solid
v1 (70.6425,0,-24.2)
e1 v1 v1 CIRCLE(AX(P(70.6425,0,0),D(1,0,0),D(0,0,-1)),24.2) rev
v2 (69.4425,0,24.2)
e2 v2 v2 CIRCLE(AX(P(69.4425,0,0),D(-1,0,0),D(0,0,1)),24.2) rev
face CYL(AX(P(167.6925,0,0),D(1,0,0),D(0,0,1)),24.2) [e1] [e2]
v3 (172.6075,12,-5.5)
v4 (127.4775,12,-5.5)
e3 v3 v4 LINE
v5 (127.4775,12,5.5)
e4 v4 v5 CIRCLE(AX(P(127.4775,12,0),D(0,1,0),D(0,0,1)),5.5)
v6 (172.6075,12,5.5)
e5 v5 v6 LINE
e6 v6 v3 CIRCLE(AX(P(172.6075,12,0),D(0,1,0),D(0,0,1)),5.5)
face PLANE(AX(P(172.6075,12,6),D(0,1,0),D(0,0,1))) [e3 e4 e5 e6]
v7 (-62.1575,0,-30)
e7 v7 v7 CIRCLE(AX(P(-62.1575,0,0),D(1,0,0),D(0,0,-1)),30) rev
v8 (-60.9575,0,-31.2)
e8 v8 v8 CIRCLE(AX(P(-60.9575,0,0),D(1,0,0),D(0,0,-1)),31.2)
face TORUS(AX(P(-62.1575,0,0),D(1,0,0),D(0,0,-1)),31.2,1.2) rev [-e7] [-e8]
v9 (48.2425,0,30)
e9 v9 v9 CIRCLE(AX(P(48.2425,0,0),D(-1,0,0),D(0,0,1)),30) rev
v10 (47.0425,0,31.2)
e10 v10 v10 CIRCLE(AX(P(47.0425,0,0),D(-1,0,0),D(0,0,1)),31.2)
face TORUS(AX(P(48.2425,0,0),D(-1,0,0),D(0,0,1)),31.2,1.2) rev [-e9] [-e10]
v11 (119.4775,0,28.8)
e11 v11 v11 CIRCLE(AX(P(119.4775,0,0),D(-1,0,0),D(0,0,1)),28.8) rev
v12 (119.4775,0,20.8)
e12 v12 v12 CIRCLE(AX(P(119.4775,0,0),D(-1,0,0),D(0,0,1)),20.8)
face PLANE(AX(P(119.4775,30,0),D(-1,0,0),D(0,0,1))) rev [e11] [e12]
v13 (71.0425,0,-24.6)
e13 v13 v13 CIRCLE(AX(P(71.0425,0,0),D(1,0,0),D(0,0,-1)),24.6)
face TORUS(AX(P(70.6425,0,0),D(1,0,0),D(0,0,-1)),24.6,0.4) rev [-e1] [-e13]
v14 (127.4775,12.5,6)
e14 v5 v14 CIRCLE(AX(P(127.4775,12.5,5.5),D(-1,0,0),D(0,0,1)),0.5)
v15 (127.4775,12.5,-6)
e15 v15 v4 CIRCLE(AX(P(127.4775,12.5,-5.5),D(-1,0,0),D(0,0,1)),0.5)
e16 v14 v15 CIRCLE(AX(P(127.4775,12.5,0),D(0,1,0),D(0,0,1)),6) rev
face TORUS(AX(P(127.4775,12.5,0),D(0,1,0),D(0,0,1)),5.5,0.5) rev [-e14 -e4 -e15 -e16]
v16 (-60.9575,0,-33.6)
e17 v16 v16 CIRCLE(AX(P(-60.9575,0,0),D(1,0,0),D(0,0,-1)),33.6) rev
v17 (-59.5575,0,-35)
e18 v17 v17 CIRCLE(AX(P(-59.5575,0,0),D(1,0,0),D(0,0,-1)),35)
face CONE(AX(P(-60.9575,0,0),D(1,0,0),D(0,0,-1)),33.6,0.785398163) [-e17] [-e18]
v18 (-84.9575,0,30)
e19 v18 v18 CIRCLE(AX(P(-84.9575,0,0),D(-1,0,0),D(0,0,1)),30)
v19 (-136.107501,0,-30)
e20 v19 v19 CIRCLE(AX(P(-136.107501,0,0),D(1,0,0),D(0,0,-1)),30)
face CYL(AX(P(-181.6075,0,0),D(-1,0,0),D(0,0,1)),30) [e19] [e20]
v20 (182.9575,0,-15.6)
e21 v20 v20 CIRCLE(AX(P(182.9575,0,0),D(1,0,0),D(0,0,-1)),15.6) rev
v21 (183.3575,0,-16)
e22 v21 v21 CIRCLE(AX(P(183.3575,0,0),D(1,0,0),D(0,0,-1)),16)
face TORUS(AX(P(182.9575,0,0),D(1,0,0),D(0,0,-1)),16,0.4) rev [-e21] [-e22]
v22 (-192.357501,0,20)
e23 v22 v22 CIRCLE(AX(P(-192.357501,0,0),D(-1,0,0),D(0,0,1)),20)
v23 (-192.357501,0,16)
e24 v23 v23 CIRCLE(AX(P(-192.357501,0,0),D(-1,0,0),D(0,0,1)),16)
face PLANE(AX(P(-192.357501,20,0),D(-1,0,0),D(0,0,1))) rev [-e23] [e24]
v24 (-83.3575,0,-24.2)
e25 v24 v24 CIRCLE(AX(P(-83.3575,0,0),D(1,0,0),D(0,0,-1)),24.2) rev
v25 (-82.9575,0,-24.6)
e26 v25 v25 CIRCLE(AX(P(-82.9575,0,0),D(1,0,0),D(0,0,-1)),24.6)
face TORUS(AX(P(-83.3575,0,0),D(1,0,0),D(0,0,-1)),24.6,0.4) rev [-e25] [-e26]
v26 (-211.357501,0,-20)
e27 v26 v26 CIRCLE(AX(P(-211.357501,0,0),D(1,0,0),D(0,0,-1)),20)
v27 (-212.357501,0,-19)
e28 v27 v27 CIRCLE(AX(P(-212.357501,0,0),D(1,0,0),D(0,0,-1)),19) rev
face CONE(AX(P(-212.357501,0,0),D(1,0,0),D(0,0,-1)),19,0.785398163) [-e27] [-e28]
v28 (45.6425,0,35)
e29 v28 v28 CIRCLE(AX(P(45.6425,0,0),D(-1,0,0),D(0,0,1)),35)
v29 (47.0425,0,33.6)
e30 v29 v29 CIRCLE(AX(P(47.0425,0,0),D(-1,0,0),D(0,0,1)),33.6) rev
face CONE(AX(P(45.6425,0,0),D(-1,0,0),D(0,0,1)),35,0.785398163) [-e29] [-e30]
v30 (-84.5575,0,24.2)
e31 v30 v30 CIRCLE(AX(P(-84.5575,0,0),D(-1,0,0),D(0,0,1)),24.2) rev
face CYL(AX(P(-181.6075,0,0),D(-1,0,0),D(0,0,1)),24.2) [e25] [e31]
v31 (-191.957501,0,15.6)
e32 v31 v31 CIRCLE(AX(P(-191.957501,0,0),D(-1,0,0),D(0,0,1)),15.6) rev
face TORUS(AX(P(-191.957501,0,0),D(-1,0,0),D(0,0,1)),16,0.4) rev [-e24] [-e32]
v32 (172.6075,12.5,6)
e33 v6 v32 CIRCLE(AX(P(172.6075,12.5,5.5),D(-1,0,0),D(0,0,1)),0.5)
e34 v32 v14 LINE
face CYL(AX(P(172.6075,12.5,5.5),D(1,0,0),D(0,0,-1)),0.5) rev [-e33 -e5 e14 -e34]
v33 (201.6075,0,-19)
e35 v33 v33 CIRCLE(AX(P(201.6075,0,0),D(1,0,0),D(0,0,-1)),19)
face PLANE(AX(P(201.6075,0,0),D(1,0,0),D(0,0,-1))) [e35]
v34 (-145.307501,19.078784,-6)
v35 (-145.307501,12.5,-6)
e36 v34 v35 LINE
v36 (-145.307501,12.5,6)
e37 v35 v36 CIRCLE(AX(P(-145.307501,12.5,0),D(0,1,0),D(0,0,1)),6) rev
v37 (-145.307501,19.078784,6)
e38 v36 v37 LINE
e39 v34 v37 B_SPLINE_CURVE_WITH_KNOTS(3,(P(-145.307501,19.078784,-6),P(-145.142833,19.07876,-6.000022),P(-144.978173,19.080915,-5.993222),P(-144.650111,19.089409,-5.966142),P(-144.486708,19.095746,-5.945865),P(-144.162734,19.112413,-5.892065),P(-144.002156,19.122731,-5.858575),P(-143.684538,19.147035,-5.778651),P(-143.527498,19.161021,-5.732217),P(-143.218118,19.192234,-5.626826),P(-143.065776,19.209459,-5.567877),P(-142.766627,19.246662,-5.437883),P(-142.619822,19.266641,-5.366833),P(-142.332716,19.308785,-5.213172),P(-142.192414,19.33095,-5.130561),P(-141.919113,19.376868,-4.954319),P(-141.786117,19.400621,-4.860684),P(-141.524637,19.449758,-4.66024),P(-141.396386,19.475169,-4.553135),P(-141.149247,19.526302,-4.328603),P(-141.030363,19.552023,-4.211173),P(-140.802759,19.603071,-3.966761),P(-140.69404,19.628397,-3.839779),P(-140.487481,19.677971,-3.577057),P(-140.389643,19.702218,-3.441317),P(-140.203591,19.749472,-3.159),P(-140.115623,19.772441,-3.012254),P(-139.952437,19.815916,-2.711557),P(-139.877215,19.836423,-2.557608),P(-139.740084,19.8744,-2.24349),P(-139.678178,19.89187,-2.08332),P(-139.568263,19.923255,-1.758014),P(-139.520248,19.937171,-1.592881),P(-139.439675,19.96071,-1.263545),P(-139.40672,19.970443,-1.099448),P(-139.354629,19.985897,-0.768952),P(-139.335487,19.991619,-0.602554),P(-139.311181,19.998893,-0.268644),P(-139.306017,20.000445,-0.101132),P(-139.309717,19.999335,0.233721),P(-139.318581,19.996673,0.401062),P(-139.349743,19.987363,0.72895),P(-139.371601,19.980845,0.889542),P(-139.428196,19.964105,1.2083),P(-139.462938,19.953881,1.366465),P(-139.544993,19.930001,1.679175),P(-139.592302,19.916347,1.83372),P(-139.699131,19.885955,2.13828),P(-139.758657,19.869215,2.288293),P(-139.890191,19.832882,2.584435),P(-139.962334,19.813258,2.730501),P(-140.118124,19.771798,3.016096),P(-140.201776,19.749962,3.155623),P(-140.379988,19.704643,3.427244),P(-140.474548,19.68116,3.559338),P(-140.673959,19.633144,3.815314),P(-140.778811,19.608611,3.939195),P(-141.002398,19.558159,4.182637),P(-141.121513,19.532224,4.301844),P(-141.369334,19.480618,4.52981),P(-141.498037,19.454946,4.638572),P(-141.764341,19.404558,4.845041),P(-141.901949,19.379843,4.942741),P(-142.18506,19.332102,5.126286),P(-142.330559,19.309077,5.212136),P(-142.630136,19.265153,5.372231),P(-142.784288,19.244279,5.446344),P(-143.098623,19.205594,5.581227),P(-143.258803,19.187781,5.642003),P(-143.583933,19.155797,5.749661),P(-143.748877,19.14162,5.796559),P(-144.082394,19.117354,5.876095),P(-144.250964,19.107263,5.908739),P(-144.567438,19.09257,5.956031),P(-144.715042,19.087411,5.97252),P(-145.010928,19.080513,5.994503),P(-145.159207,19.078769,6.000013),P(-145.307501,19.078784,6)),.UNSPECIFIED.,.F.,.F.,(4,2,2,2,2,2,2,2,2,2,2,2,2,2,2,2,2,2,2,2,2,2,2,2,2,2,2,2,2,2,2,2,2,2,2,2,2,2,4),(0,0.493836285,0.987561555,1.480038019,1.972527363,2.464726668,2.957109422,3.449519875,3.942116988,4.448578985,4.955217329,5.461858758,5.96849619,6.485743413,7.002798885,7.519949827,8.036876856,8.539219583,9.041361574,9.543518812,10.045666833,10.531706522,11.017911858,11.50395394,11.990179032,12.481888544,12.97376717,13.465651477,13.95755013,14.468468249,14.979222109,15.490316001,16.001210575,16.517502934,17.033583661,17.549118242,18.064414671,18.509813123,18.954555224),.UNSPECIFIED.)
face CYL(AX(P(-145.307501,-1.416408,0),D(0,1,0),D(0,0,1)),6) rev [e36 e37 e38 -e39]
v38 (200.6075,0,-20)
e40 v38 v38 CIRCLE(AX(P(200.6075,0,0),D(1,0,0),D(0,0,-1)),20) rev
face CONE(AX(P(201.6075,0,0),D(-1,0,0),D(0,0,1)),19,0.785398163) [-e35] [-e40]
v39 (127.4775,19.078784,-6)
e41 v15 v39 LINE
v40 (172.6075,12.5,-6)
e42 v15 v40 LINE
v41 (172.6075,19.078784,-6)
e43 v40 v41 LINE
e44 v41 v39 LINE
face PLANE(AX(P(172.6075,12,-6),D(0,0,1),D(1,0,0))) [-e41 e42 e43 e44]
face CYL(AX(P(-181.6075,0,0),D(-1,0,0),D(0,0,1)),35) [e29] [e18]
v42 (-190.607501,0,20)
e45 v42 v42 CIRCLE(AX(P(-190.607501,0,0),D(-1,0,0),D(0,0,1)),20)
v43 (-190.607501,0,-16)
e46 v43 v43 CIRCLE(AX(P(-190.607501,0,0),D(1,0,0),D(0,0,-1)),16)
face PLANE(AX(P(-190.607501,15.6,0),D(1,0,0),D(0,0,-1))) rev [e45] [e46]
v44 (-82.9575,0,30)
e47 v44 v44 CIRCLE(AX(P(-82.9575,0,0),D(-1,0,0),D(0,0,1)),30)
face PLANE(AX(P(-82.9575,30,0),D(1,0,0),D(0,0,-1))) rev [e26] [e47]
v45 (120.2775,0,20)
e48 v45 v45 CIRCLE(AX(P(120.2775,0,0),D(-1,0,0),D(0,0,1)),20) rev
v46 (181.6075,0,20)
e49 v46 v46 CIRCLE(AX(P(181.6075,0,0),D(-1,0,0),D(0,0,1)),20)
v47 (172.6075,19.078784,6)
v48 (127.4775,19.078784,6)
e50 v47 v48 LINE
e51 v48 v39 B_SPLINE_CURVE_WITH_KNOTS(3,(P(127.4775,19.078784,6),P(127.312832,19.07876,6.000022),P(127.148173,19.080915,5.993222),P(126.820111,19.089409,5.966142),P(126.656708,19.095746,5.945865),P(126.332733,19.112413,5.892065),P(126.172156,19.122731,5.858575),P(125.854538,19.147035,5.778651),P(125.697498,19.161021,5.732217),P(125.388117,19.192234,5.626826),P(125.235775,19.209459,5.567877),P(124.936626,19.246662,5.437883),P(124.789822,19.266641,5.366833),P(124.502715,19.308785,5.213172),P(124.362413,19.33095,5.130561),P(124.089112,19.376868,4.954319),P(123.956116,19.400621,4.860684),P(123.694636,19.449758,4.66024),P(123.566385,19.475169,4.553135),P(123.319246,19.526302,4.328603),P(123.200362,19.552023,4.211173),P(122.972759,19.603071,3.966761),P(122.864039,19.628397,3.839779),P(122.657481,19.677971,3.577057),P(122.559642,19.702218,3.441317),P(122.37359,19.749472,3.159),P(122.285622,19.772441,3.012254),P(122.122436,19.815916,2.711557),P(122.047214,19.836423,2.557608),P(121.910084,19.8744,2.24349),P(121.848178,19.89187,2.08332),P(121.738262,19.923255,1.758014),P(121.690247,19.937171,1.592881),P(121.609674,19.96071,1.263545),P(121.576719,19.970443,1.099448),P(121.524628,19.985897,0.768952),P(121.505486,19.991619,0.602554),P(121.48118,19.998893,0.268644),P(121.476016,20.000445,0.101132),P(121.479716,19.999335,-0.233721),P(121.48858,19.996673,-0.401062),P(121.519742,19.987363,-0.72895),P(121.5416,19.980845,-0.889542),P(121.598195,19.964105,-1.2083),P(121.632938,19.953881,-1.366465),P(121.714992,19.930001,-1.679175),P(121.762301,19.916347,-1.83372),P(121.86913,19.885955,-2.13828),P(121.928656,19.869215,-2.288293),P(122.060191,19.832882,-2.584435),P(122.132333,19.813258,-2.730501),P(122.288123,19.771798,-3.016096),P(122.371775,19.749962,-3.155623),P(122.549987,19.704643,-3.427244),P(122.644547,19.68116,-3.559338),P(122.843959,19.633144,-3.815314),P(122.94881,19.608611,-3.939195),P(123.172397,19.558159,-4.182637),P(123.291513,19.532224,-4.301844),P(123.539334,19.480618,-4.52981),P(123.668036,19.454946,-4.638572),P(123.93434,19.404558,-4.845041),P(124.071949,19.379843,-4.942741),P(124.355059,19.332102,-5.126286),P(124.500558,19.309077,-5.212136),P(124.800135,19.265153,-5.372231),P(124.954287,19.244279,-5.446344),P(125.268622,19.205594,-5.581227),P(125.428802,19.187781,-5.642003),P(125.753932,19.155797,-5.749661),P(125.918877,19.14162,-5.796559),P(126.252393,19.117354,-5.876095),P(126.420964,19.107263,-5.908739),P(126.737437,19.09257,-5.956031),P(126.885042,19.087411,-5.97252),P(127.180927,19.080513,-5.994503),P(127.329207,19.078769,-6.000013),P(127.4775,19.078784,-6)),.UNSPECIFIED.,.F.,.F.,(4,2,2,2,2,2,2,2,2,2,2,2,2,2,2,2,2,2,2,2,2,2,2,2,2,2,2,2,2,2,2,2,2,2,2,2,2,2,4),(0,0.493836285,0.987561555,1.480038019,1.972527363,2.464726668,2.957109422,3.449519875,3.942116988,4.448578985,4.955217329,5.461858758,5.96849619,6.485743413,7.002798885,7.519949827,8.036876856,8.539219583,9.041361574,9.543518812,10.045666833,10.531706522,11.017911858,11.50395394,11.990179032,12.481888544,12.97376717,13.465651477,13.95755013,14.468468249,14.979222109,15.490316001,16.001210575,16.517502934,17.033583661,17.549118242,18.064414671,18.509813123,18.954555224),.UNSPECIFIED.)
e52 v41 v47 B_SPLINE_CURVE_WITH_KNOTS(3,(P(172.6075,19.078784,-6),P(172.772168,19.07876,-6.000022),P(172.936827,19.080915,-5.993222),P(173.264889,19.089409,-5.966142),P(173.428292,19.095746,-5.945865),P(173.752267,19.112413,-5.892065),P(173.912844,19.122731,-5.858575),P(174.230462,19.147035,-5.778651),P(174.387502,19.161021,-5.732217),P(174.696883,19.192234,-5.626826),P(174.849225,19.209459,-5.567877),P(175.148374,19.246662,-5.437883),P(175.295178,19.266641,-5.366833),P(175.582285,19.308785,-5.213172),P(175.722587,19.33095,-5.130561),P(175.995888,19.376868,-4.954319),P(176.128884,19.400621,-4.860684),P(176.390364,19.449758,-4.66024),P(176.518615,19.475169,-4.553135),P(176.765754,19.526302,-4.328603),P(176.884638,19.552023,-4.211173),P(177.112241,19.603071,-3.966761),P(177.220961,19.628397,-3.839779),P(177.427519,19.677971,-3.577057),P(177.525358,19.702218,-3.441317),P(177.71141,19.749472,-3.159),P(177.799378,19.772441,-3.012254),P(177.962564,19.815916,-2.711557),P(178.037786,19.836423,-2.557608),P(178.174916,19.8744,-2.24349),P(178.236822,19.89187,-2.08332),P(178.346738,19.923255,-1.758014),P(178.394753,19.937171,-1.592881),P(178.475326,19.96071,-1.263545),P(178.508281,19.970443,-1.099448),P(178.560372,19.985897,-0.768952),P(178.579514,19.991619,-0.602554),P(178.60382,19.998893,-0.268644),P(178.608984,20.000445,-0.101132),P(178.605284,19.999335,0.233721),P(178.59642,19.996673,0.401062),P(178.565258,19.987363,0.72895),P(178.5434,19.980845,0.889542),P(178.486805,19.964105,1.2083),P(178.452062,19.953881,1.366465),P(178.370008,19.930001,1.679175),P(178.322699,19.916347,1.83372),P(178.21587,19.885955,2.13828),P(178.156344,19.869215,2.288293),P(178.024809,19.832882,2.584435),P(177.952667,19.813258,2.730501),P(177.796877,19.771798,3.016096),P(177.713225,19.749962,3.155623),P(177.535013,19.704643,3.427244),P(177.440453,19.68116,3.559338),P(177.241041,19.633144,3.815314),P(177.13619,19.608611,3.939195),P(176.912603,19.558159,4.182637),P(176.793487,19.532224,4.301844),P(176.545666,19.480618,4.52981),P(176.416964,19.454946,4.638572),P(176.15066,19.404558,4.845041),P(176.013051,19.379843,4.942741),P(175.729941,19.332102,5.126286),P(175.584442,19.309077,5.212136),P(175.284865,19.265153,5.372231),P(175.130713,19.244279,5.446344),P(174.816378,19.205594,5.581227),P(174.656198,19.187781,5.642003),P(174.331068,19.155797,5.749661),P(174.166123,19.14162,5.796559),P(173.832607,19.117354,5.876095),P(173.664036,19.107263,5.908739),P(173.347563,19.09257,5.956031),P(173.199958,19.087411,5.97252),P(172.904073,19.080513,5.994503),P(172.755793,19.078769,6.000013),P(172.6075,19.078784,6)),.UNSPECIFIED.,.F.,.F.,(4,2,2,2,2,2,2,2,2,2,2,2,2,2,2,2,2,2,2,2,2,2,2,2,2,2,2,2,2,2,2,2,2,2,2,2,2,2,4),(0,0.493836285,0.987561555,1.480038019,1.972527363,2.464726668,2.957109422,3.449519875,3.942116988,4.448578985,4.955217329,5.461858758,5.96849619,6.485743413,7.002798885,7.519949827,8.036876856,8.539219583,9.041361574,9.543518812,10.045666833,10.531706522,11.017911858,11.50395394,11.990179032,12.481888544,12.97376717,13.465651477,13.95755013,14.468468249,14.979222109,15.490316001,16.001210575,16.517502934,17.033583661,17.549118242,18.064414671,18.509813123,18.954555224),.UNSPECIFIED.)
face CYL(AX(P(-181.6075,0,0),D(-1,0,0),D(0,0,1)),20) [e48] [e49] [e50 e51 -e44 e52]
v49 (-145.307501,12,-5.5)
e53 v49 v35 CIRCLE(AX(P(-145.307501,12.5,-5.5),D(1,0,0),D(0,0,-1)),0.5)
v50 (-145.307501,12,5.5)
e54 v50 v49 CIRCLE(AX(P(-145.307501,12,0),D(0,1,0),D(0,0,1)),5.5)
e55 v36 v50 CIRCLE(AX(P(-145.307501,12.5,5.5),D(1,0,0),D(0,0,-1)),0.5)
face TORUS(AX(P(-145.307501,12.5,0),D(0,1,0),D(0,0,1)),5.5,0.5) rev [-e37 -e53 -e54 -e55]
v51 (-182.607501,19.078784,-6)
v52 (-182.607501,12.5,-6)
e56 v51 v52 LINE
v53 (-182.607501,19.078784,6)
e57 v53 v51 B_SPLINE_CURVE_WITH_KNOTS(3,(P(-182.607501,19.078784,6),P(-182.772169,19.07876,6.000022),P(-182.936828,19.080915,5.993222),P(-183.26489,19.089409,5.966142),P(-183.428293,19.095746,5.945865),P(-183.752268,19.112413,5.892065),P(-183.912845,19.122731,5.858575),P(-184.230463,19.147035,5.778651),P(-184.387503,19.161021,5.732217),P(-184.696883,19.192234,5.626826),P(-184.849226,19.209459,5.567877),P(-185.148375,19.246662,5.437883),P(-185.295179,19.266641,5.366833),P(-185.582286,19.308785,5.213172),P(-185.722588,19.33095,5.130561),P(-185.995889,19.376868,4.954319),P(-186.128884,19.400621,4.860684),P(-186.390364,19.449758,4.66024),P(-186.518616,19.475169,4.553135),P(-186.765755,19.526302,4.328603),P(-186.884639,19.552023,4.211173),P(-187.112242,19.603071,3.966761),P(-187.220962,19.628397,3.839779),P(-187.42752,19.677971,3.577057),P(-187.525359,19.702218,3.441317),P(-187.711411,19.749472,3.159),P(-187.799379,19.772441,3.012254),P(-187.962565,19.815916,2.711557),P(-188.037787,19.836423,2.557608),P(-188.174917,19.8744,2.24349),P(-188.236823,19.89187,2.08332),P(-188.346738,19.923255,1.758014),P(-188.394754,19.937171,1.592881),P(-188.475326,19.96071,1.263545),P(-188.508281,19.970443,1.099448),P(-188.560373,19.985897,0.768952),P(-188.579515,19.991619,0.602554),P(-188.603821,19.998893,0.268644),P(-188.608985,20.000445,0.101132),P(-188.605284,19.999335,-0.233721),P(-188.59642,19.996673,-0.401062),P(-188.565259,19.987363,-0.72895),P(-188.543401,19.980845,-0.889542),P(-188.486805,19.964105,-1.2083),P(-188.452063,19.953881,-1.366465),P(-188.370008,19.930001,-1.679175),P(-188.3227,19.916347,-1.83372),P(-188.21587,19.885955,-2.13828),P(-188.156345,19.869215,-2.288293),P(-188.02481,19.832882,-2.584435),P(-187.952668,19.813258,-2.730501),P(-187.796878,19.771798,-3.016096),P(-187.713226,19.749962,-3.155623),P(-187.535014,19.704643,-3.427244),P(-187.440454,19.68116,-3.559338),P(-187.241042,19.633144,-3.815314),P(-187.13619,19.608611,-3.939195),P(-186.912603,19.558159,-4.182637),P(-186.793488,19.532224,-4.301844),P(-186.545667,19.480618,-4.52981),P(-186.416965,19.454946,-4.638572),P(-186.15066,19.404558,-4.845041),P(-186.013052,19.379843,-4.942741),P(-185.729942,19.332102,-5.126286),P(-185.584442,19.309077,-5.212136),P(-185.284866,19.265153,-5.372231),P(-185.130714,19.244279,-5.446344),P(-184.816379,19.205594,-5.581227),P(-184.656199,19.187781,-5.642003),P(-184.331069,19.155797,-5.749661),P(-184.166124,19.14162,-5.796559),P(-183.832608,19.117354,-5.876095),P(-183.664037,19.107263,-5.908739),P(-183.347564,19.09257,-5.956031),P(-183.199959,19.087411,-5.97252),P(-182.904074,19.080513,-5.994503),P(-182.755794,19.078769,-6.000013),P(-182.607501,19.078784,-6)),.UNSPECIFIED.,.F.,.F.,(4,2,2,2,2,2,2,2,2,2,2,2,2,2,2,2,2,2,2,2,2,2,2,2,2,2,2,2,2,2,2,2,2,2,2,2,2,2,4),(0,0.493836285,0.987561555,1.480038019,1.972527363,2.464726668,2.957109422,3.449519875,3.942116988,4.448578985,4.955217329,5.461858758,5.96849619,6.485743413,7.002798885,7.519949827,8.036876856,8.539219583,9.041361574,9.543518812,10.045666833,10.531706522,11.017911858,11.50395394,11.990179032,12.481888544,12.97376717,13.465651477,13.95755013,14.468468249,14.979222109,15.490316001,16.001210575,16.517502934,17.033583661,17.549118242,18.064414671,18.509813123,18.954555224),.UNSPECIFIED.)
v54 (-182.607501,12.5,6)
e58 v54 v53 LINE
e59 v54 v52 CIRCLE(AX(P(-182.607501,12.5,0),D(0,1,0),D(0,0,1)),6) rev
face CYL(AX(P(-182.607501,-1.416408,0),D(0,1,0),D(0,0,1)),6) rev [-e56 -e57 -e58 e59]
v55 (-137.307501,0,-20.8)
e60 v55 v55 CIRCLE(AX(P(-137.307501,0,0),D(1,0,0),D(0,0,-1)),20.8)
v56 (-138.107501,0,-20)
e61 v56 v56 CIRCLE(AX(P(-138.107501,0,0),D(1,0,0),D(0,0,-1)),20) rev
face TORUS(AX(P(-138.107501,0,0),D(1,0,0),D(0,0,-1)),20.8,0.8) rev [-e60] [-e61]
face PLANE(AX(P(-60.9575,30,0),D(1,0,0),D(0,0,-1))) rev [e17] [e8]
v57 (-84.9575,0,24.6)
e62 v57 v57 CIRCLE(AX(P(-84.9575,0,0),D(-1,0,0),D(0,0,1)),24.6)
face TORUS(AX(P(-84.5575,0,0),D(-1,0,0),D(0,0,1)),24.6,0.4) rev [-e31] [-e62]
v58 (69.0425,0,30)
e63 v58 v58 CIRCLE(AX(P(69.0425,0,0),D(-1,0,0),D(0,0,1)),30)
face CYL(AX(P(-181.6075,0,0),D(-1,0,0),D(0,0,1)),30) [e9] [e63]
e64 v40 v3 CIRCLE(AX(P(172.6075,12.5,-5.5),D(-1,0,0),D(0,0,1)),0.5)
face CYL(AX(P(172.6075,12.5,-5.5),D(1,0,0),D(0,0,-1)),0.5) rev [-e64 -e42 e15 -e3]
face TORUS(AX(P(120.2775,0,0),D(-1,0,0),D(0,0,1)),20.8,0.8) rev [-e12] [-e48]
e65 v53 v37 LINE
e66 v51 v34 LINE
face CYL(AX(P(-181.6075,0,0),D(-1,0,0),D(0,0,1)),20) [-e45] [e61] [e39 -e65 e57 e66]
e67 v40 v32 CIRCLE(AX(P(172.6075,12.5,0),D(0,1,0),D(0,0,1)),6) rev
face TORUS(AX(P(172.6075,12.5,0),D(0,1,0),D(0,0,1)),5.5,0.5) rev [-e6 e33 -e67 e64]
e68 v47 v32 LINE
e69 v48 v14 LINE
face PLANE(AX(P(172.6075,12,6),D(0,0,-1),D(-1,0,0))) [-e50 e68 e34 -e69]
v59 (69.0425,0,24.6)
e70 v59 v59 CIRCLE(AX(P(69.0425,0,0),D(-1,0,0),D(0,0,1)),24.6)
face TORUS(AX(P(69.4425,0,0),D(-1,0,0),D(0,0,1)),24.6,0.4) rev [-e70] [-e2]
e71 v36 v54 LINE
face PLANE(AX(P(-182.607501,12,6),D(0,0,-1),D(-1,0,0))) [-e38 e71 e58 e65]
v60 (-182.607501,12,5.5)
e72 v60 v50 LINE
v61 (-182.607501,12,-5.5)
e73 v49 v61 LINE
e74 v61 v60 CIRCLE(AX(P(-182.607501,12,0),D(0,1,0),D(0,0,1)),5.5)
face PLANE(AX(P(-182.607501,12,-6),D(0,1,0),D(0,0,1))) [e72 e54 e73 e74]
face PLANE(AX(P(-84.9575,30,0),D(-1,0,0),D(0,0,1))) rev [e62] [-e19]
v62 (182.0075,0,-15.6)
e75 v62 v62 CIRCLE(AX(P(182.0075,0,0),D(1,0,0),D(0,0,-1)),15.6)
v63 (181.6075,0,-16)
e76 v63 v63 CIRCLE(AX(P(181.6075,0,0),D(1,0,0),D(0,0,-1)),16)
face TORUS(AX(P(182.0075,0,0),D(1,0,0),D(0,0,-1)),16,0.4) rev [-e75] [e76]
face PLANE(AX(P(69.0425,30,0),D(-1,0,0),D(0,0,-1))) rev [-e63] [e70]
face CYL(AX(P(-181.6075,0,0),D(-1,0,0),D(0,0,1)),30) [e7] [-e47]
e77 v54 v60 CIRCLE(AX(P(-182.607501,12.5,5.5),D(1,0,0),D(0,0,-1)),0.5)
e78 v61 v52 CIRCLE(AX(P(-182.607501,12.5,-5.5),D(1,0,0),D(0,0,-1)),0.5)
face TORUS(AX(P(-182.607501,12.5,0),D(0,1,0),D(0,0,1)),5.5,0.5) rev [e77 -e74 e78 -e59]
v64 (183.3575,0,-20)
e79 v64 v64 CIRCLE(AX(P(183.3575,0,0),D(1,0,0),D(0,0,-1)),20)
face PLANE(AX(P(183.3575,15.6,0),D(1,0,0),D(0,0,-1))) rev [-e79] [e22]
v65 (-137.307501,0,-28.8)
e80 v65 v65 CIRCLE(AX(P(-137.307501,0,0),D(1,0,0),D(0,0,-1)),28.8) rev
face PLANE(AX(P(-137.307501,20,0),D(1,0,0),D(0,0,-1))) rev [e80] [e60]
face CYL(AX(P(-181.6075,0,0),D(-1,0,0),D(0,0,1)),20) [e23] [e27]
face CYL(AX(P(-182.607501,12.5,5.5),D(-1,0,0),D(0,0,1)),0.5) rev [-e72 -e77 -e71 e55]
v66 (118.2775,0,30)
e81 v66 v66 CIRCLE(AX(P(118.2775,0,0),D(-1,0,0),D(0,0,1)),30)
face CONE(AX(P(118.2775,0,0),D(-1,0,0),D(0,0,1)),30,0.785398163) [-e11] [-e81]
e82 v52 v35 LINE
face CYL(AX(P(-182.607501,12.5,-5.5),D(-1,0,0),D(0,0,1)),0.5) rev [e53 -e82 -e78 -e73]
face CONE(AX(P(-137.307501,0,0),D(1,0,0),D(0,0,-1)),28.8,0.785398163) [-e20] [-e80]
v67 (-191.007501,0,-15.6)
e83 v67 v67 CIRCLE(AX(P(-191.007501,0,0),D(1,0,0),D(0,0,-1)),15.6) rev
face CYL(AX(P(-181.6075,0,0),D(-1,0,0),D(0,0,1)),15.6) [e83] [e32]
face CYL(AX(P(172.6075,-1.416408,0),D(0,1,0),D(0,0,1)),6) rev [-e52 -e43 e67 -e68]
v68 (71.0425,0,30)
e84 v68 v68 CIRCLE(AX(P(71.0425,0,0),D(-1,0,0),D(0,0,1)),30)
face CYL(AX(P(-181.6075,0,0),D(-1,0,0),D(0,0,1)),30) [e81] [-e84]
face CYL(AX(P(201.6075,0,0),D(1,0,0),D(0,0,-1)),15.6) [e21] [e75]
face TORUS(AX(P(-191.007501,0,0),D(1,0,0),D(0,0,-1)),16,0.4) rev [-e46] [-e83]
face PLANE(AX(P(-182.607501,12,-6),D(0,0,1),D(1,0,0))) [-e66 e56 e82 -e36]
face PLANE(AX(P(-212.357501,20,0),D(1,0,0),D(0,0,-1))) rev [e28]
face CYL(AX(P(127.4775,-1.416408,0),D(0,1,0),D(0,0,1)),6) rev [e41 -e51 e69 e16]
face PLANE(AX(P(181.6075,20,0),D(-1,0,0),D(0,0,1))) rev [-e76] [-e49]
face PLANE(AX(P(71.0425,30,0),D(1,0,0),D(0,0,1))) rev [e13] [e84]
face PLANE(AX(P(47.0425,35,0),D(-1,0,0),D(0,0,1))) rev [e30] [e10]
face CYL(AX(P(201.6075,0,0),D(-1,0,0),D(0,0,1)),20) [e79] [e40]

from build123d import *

# Parameters (mm, degrees)
MIRROR1_START       = 69.0425
MIRROR1_OUTLINE_R   = 30
MIRROR1_OUTLINE_R_2 = 24.2
MIRROR1_DEPTH       = 2
SKETCH4_R           = 20
BOSS_EXTRUDE1_DEPTH = 20
SKETCH5_W           = 1.75
SKETCH5_H           = 4.4
CUT_EXTRUDE1_DEPTH  = 37.3
FILLET1_R           = 0.8
CHAMFER1_SIZE       = 1.2
FILLET2_R           = 1.2
CHAMFER2_SIZE       = 1.4
CHAMFER3_SIZE       = 1.4
FILLET3_R           = 1.2
CHAMFER4_SIZE       = 1.2
FILLET4_R           = 0.8
CUT_EXTRUDE2_START  = 45.13
CUT_EXTRUDE2_DEPTH  = 45.13
CUT_EXTRUDE3_DEPTH  = 8
FILLET5_R           = 0.5
CUT_EXTRUDE4_DEPTH  = 8
FILLET6_R           = 0.4
FILLET10_R          = 0.4
FILLET12_R          = 0.4
FILLET13_R          = 0.4
FILLET14_R          = 0.5
CHAMFER5_SIZE       = 1
CHAMFER6_SIZE       = 1


# Read off the part's stored shape, not the designer's step: Mirror1
with BuildPart() as part:
    # Sketch2 → Revolve1 (revolve)
    with BuildSketch(Plane.XY, mode=Mode.PRIVATE) as revolve1_sk:
        Polygon((-137.307500742, 20), (-137.307500742, 30), (-84.9575, 30), (-84.9575, 24.2), (-82.9575, 24.2), (-82.9575, 30), (-60.9575, 30), (-60.9575, 35), (47.0425, 35), (47.0425, 30), (119.4775, 30), (119.4775, 20), (181.6075, 20), (181.6075, 0), (-181.6075, 0), (-212.357500742, 0), (-212.357500742, 20), (-192.357500742, 20), (-192.357500742, 15.6), (-190.607500742, 15.6), (-190.607500742, 20), align=None)
    revolve(revolve1_sk.sketch.rotate(Axis((-181.6075, 0, 0), (1, 0, 0)), 90), axis=Axis((-181.6075, 0, 0), (1, 0, 0)))

    # Mirror1 outline → Mirror1 (cut)
    with BuildSketch(Plane.YZ.offset(MIRROR1_START)):
        Circle(MIRROR1_OUTLINE_R)
        Circle(MIRROR1_OUTLINE_R_2, mode=Mode.SUBTRACT)
    extrude(amount=MIRROR1_DEPTH, mode=Mode.SUBTRACT)

    # Sketch6 → Cut-Extrude1 (cut)
    with BuildSketch(Plane.ZY.offset(145.307500742)):
        with BuildLine():
            Line((-6, 12), (6, 12))
            Line((6, 12), (6, 19.078784028))
            ThreePointArc((6, 19.078784028), (0, 20), (-6, 19.078784028))
            Line((-6, 19.078784028), (-6, 12))
        make_face()
    extrude(amount=CUT_EXTRUDE1_DEPTH, mode=Mode.SUBTRACT)

    # Fillet1
    fillet1_edges = [part.edges().sort_by_distance(p)[0] for p in [
        (-137.307500742, 0, -20),
    ]]
    fillet(fillet1_edges, radius=FILLET1_R)

    # Chamfer1
    chamfer1_edges = [part.edges().sort_by_distance(p)[0] for p in [
        (-137.307500742, 0, -30),
    ]]
    chamfer(chamfer1_edges, length=CHAMFER1_SIZE)

    # Fillet2
    fillet2_edges = [part.edges().sort_by_distance(p)[0] for p in [
        (-60.9575, 0, -30),
    ]]
    fillet(fillet2_edges, radius=FILLET2_R)

    # Chamfer2
    chamfer2_edges = [part.edges().sort_by_distance(p)[0] for p in [
        (-60.9575, 0, -35),
    ]]
    chamfer(chamfer2_edges, length=CHAMFER2_SIZE)

    # Chamfer3
    chamfer3_edges = [part.edges().sort_by_distance(p)[0] for p in [
        (47.0425, 0, -35),
    ]]
    chamfer(chamfer3_edges, length=CHAMFER3_SIZE)

    # Fillet3
    fillet3_edges = [part.edges().sort_by_distance(p)[0] for p in [
        (47.0425, 0, -30),
    ]]
    fillet(fillet3_edges, radius=FILLET3_R)

    # Chamfer4
    chamfer4_edges = [part.edges().sort_by_distance(p)[0] for p in [
        (119.4775, 0, -30),
    ]]
    chamfer(chamfer4_edges, length=CHAMFER4_SIZE)

    # Fillet4
    fillet4_edges = [part.edges().sort_by_distance(p)[0] for p in [
        (119.4775, 0, -20),
    ]]
    fillet(fillet4_edges, radius=FILLET4_R)

    # Sketch7 → Cut-Extrude2 (cut)
    with BuildSketch(Plane(origin=(127.4775, 0, 0), x_dir=(0, 0, -1), z_dir=(1, 0, 0)).offset(CUT_EXTRUDE2_START)):
        with BuildLine():
            Line((-6, 12), (6, 12))
            Line((6, 12), (6, 19.078784028))
            ThreePointArc((6, 19.078784028), (0, 20), (-6, 19.078784028))
            Line((-6, 19.078784028), (-6, 12))
        make_face()
    extrude(amount=-CUT_EXTRUDE2_DEPTH, mode=Mode.SUBTRACT)

    # Sketch8 → Cut-Extrude3 (cut)
    with BuildSketch(Plane(origin=(0, 20, 0), x_dir=(1, 0, 0), z_dir=(0, 1, 0))):
        with BuildLine():
            Line((-145.307500742, 6), (-145.307500742, -6))
            ThreePointArc((-145.307500742, -6), (-139.307500742, 0), (-145.307500742, 6))
        make_face()
        with BuildLine():
            Line((-182.607500742, -6), (-182.607500742, 6))
            ThreePointArc((-182.607500742, 6), (-188.607500742, 0), (-182.607500742, -6))
        make_face()
    extrude(amount=-CUT_EXTRUDE3_DEPTH, mode=Mode.SUBTRACT)

    # Fillet5
    fillet5_edges = [part.edges().sort_by_distance(p)[0] for p in [
        (-139.307500742, 12, 0),
        (-188.607500742, 12, 0),
        (-163.957500742, 12, 6),
        (-163.957500742, 12, -6),
    ]]
    fillet(fillet5_edges, radius=FILLET5_R)

    # Sketch9 → Cut-Extrude4 (cut)
    with BuildSketch(Plane(origin=(0, 20, 0), x_dir=(1, 0, 0), z_dir=(0, 1, 0))):
        with BuildLine():
            Line((127.4775, 6), (127.4775, -6))
            ThreePointArc((127.4775, -6), (121.4775, 0), (127.4775, 6))
        make_face()
        with BuildLine():
            Line((172.6075, 6), (172.6075, -6))
            ThreePointArc((172.6075, -6), (178.6075, 0), (172.6075, 6))
        make_face()
    extrude(amount=-CUT_EXTRUDE4_DEPTH, mode=Mode.SUBTRACT)

    # Fillet6
    fillet6_edges = [part.edges().sort_by_distance(p)[0] for p in [
        (69.0425, -24.2, 0),
        (71.0425, -24.2, 0),
    ]]
    fillet(fillet6_edges, radius=FILLET6_R)

    # Fillet12
    fillet12_edges = [part.edges().sort_by_distance(p)[0] for p in [
        (-84.9575, 0, -24.2),
        (-82.9575, 0, -24.2),
    ]]
    fillet(fillet12_edges, radius=FILLET12_R)

    # Fillet13
    fillet13_edges = [part.edges().sort_by_distance(p)[0] for p in [
        (-192.357500742, 0, -15.6),
        (-190.607500742, 0, -15.6),
    ]]
    fillet(fillet13_edges, radius=FILLET13_R)



with BuildPart() as body_2:
    # Sketch4 → Boss-Extrude1 (new body)
    with BuildSketch(Plane(origin=(181.6075, 0, 0), x_dir=(0, 0, -1), z_dir=(1, 0, 0))):
        Circle(SKETCH4_R)
    extrude(amount=BOSS_EXTRUDE1_DEPTH)

    # Sketch5 → Cut-Revolve1 (revolve, cut)
    with BuildSketch(Plane.XY, mode=Mode.PRIVATE) as cut_revolve1_sk:
        with Locations((182.4825, 17.8)):
            Rectangle(SKETCH5_W, SKETCH5_H)
    revolve(cut_revolve1_sk.sketch.rotate(Axis((201.6075, 0, 0), (-1, 0, 0)), 90), axis=Axis((201.6075, 0, 0), (-1, 0, 0)), mode=Mode.SUBTRACT)

    # Fillet10
    fillet10_edges = [body_2.edges().sort_by_distance(p)[0] for p in [
        (183.3575, 0, 15.6),
    ]]
    fillet(fillet10_edges, radius=FILLET10_R)


with BuildPart() as part_1:
    add(part.part)

    add(body_2.part)  # Revolve3 merges body 2
    # Sketch11 → Revolve3 (revolve)
    with BuildSketch(Plane.XY, mode=Mode.PRIVATE) as revolve3_sk:
        with BuildLine():
            Line((181.6075, 16), (181.6075, 15.6))
            Line((181.6075, 15.6), (182.0075, 15.6))
            ThreePointArc((182.0075, 15.6), (181.724657288, 15.717157288), (181.6075, 16))
        make_face()
    revolve(revolve3_sk.sketch.rotate(Axis((201.6075, 0, 0), (-1, 0, 0)), 90), axis=Axis((201.6075, 0, 0), (-1, 0, 0)))

    # Fillet14
    fillet14_edges = [part_1.edges().sort_by_distance(p)[0] for p in [
        (150.0425, 12, 6),
        (150.0425, 12, -6),
        (121.4775, 12, 0),
        (178.6075, 12, 0),
    ]]
    fillet(fillet14_edges, radius=FILLET14_R)

    # Chamfer5
    chamfer5_edges = [part_1.edges().sort_by_distance(p)[0] for p in [
        (201.6075, 0, 20),
    ]]
    chamfer(chamfer5_edges, length=CHAMFER5_SIZE)

    # Chamfer6
    chamfer6_edges = [part_1.edges().sort_by_distance(p)[0] for p in [
        (-212.357500742, 0, -20),
    ]]
    chamfer(chamfer6_edges, length=CHAMFER6_SIZE)


solid = part_1.part
